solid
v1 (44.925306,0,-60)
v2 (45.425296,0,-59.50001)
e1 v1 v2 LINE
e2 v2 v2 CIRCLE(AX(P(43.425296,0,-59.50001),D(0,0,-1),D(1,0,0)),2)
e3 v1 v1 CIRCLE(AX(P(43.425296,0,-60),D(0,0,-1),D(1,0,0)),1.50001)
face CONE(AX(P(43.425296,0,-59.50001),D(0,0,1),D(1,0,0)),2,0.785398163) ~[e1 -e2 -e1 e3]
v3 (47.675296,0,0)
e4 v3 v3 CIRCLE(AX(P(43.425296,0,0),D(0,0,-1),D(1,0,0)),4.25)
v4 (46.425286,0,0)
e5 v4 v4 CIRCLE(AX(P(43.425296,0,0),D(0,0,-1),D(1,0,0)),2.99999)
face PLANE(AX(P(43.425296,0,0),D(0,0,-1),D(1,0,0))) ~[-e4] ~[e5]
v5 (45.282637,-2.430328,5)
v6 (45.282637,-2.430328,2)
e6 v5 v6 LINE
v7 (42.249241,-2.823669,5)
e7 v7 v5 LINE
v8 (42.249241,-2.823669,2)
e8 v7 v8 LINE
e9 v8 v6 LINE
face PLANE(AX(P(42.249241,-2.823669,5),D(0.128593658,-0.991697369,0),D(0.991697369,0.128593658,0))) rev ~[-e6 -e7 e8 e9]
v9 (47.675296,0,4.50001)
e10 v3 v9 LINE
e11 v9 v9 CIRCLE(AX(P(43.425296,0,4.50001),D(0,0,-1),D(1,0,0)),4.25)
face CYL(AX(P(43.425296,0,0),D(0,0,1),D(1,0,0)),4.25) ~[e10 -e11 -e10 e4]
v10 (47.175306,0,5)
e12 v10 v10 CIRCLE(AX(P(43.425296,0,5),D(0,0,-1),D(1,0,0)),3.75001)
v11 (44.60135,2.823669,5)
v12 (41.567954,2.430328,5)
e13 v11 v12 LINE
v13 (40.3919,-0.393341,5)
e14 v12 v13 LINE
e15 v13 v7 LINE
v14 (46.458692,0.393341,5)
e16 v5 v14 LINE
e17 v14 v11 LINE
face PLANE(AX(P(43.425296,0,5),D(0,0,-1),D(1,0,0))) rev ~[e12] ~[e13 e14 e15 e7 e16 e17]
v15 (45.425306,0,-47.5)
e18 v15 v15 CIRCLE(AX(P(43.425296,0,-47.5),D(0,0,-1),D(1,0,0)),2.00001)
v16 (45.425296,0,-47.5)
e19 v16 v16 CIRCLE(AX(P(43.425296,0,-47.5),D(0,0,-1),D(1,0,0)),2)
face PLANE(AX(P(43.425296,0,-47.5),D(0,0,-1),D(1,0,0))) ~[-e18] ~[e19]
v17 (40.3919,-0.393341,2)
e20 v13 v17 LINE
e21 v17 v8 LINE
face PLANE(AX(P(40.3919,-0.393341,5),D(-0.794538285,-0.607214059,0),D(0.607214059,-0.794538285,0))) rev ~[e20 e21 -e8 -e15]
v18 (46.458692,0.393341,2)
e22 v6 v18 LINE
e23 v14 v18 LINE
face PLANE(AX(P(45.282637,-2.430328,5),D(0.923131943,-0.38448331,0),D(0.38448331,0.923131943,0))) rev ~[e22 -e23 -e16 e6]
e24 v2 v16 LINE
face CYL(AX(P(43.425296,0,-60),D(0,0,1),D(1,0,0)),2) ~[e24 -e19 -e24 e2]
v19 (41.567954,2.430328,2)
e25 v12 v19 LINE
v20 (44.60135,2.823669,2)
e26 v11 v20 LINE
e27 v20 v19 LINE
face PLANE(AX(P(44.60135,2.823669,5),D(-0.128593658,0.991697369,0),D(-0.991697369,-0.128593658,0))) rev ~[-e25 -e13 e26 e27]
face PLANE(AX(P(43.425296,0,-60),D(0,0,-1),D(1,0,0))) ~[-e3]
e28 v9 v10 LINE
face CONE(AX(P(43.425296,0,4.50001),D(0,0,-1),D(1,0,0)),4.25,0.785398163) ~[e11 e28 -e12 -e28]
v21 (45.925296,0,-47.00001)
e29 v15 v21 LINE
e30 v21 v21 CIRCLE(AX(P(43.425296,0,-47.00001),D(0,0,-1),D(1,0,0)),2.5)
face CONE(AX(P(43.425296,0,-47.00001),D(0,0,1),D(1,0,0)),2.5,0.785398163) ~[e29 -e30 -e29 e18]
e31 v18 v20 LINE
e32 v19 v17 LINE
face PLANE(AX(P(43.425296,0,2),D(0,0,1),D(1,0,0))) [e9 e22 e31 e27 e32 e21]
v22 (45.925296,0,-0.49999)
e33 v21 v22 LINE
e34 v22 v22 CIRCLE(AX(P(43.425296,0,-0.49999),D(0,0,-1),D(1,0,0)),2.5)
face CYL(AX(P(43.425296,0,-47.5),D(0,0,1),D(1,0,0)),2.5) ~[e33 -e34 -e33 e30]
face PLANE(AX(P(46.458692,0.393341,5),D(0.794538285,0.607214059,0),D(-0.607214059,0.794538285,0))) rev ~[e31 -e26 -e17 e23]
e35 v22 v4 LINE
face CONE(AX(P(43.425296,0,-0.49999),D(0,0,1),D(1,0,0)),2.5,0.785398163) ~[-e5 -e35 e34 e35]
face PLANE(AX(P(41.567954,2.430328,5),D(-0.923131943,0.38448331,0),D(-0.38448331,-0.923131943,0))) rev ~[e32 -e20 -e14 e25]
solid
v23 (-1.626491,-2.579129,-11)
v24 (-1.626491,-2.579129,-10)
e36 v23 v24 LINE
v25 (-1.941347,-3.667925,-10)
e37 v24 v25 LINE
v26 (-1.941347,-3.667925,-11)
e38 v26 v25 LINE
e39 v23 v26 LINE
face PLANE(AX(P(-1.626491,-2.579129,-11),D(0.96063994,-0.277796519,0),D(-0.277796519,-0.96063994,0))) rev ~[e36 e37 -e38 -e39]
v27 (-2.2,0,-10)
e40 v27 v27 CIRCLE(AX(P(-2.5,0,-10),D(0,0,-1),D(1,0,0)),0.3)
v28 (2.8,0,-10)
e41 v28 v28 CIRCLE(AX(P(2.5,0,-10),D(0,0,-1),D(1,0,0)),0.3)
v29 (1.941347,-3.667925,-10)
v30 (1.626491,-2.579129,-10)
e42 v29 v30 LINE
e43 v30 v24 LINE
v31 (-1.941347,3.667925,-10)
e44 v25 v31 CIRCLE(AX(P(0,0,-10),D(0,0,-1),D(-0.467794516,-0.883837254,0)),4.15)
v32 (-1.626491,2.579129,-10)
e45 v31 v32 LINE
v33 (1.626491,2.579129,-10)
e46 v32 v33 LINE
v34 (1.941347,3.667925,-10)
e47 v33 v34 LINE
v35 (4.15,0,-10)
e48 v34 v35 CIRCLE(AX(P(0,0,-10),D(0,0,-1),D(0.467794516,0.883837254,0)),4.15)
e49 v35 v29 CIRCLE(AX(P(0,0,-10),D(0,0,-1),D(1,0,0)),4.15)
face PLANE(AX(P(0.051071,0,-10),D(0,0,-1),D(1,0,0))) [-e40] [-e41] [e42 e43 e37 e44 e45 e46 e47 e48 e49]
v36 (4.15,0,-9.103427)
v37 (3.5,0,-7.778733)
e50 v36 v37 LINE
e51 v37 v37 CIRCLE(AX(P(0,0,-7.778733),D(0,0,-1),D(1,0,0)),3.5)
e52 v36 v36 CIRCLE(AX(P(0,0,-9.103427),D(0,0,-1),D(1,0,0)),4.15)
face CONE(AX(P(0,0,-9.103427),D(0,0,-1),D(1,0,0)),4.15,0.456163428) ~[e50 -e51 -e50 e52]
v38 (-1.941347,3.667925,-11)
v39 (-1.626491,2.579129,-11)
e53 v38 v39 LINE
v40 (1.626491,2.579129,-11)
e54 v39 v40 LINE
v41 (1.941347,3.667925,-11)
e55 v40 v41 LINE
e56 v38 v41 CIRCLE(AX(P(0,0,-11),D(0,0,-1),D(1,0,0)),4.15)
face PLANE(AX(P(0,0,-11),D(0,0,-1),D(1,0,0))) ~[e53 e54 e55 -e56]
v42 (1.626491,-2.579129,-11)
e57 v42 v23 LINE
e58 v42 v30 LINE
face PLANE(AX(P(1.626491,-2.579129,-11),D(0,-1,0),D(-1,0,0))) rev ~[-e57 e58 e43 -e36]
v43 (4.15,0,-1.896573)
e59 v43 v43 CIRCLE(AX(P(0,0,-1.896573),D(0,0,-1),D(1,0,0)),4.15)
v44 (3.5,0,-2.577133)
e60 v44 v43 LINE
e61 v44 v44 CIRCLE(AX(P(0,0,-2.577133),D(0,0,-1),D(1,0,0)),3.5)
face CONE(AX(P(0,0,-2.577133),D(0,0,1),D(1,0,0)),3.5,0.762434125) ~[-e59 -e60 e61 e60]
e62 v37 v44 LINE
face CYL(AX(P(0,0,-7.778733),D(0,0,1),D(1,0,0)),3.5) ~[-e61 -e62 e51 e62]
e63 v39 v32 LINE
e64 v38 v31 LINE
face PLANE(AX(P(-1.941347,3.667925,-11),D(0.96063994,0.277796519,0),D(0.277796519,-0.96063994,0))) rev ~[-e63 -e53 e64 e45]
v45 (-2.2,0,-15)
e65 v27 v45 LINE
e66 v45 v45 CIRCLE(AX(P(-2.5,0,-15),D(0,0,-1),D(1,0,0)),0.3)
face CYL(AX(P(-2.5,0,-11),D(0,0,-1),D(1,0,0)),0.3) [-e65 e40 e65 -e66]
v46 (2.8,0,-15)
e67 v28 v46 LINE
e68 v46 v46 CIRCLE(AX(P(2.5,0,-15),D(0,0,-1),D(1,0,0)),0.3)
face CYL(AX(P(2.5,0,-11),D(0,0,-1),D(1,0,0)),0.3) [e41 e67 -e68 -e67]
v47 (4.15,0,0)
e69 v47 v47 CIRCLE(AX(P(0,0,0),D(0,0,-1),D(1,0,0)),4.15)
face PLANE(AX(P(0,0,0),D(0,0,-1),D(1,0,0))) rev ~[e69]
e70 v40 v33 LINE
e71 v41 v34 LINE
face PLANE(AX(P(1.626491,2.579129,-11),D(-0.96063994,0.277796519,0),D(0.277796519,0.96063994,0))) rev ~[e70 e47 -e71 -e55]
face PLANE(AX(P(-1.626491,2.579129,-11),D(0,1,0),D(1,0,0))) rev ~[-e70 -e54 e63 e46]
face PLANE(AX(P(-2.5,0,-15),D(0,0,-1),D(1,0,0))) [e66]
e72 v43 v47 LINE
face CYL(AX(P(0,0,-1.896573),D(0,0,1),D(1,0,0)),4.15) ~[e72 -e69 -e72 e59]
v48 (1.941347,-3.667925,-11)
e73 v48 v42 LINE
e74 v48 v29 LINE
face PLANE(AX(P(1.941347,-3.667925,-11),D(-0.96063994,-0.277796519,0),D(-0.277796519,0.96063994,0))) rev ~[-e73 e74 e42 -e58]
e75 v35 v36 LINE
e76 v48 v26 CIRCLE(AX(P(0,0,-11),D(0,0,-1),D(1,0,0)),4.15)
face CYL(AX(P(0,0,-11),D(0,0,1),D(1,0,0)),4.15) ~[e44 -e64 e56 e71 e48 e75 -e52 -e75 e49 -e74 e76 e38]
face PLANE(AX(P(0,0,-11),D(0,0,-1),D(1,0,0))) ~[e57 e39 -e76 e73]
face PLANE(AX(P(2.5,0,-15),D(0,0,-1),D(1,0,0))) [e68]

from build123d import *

# Parameters (mm, degrees)
F2_R     = 0.3
F3_DEPTH = 4
F4_DEPTH = 1
F7_DEPTH = 3
F8_SIZE  = 0.49999


# Not quite as in the source:
# - a fillet or chamfer is up to 0.001 mm smaller than in the source, because OpenCascade refuses the exact size


with BuildPart() as f1:
    # F0 (on Front) → F1 (revolve)
    with BuildSketch(Plane.XZ):
        Polygon((4.15, 0), (0, 0), (0, -11), (4.15, -11), (4.15, -9.1034269934), (3.5, -7.7787333211), (3.5, -2.5771334185), (4.15, -1.8965730066), align=None)
    revolve(axis=Axis((0, 0, -5.7281980938), (0, 0, -1)))

    # F2 (on face) → F3 (join)
    with BuildSketch(Plane(origin=(0, 0, -11), x_dir=(1, 0, 0), z_dir=(0, 0, -1))):
        with Locations((-2.5, 0)):
            Circle(F2_R)
        with Locations((2.5, 0)):
            Circle(F2_R)
    extrude(amount=F3_DEPTH)

    # F2 (on face) → F4 (cut)
    with BuildSketch(Plane(origin=(0, 0, -11), x_dir=(1, 0, 0), z_dir=(0, 0, -1))):
        with BuildLine():
            Line((-1.6264907317, 2.5791286025), (-1.9413472416, 3.6679246022))
            ThreePointArc((-1.9413472416, 3.6679246022), (-4.15, 0), (-1.9413472416, -3.6679246022))
            Line((-1.9413472416, -3.6679246022), (-1.6264907317, -2.5791286025))
            Line((-1.6264907317, -2.5791286025), (0, -2.5791286025))
            Line((0, -2.5791286025), (1.6264907317, -2.5791286025))
            Line((1.6264907317, -2.5791286025), (1.9413472416, -3.6679246022))
            ThreePointArc((1.9413472416, -3.6679246022), (3.555213851, -2.140783612), (4.15, 0))
            ThreePointArc((4.15, 0), (3.555213851, 2.140783612), (1.9413472416, 3.6679246022))
            Line((1.9413472416, 3.6679246022), (1.6264907317, 2.5791286025))
            Line((1.6264907317, 2.5791286025), (0, 2.5791286025))
            Line((0, 2.5791286025), (-1.6264907317, 2.5791286025))
        make_face()
        with Locations((-2.5, 0)):
            Circle(F2_R, mode=Mode.SUBTRACT)
        with Locations((2.5, 0)):
            Circle(F2_R, mode=Mode.SUBTRACT)
    extrude(amount=-F4_DEPTH, mode=Mode.SUBTRACT)


with BuildPart() as f5:
    # F0 (on Front) → F5 (revolve)
    with BuildSketch(Plane.XZ):
        Polygon((43.4252958298, 5), (43.4252958298, 0), (45.9252958298, 0), (47.6752958298, 0), (47.6752958298, 5), align=None)
        Polygon((45.9252958298, 0), (43.4252958298, 0), (43.4252958298, -60), (45.4252958298, -60), (45.4252958298, -47.5), (45.9252958298, -47.5), align=None)
    revolve(axis=Axis((43.4252958298, 0, -3.0905508995), (0, 0, -1)))

    # F6 (on face) → F7 (cut)
    with BuildSketch(Plane.XY.offset(5)):
        Polygon((46.4586920028, 0.3933412765), (44.6013503785, 2.8236687838), (41.5679542055, 2.4303275073), (40.3918996567, -0.3933412765), (42.2492412811, -2.8236687838), (45.2826374541, -2.4303275073), align=None)
    extrude(amount=-F7_DEPTH, mode=Mode.SUBTRACT)

    # F8 (size 0.5 in the source; OpenCascade refuses exactly that, so slightly less here)
    f8_edges = [f5.edges().sort_by_distance(p)[0] for p in [
        (39.175296, 0, 5),
        (40.925296, 0, 0),
        (40.925296, 0, -47.5),
        (41.425296, 0, -60),
    ]]
    chamfer(f8_edges, length=F8_SIZE)


solid = Compound([f1.part, f5.part])
